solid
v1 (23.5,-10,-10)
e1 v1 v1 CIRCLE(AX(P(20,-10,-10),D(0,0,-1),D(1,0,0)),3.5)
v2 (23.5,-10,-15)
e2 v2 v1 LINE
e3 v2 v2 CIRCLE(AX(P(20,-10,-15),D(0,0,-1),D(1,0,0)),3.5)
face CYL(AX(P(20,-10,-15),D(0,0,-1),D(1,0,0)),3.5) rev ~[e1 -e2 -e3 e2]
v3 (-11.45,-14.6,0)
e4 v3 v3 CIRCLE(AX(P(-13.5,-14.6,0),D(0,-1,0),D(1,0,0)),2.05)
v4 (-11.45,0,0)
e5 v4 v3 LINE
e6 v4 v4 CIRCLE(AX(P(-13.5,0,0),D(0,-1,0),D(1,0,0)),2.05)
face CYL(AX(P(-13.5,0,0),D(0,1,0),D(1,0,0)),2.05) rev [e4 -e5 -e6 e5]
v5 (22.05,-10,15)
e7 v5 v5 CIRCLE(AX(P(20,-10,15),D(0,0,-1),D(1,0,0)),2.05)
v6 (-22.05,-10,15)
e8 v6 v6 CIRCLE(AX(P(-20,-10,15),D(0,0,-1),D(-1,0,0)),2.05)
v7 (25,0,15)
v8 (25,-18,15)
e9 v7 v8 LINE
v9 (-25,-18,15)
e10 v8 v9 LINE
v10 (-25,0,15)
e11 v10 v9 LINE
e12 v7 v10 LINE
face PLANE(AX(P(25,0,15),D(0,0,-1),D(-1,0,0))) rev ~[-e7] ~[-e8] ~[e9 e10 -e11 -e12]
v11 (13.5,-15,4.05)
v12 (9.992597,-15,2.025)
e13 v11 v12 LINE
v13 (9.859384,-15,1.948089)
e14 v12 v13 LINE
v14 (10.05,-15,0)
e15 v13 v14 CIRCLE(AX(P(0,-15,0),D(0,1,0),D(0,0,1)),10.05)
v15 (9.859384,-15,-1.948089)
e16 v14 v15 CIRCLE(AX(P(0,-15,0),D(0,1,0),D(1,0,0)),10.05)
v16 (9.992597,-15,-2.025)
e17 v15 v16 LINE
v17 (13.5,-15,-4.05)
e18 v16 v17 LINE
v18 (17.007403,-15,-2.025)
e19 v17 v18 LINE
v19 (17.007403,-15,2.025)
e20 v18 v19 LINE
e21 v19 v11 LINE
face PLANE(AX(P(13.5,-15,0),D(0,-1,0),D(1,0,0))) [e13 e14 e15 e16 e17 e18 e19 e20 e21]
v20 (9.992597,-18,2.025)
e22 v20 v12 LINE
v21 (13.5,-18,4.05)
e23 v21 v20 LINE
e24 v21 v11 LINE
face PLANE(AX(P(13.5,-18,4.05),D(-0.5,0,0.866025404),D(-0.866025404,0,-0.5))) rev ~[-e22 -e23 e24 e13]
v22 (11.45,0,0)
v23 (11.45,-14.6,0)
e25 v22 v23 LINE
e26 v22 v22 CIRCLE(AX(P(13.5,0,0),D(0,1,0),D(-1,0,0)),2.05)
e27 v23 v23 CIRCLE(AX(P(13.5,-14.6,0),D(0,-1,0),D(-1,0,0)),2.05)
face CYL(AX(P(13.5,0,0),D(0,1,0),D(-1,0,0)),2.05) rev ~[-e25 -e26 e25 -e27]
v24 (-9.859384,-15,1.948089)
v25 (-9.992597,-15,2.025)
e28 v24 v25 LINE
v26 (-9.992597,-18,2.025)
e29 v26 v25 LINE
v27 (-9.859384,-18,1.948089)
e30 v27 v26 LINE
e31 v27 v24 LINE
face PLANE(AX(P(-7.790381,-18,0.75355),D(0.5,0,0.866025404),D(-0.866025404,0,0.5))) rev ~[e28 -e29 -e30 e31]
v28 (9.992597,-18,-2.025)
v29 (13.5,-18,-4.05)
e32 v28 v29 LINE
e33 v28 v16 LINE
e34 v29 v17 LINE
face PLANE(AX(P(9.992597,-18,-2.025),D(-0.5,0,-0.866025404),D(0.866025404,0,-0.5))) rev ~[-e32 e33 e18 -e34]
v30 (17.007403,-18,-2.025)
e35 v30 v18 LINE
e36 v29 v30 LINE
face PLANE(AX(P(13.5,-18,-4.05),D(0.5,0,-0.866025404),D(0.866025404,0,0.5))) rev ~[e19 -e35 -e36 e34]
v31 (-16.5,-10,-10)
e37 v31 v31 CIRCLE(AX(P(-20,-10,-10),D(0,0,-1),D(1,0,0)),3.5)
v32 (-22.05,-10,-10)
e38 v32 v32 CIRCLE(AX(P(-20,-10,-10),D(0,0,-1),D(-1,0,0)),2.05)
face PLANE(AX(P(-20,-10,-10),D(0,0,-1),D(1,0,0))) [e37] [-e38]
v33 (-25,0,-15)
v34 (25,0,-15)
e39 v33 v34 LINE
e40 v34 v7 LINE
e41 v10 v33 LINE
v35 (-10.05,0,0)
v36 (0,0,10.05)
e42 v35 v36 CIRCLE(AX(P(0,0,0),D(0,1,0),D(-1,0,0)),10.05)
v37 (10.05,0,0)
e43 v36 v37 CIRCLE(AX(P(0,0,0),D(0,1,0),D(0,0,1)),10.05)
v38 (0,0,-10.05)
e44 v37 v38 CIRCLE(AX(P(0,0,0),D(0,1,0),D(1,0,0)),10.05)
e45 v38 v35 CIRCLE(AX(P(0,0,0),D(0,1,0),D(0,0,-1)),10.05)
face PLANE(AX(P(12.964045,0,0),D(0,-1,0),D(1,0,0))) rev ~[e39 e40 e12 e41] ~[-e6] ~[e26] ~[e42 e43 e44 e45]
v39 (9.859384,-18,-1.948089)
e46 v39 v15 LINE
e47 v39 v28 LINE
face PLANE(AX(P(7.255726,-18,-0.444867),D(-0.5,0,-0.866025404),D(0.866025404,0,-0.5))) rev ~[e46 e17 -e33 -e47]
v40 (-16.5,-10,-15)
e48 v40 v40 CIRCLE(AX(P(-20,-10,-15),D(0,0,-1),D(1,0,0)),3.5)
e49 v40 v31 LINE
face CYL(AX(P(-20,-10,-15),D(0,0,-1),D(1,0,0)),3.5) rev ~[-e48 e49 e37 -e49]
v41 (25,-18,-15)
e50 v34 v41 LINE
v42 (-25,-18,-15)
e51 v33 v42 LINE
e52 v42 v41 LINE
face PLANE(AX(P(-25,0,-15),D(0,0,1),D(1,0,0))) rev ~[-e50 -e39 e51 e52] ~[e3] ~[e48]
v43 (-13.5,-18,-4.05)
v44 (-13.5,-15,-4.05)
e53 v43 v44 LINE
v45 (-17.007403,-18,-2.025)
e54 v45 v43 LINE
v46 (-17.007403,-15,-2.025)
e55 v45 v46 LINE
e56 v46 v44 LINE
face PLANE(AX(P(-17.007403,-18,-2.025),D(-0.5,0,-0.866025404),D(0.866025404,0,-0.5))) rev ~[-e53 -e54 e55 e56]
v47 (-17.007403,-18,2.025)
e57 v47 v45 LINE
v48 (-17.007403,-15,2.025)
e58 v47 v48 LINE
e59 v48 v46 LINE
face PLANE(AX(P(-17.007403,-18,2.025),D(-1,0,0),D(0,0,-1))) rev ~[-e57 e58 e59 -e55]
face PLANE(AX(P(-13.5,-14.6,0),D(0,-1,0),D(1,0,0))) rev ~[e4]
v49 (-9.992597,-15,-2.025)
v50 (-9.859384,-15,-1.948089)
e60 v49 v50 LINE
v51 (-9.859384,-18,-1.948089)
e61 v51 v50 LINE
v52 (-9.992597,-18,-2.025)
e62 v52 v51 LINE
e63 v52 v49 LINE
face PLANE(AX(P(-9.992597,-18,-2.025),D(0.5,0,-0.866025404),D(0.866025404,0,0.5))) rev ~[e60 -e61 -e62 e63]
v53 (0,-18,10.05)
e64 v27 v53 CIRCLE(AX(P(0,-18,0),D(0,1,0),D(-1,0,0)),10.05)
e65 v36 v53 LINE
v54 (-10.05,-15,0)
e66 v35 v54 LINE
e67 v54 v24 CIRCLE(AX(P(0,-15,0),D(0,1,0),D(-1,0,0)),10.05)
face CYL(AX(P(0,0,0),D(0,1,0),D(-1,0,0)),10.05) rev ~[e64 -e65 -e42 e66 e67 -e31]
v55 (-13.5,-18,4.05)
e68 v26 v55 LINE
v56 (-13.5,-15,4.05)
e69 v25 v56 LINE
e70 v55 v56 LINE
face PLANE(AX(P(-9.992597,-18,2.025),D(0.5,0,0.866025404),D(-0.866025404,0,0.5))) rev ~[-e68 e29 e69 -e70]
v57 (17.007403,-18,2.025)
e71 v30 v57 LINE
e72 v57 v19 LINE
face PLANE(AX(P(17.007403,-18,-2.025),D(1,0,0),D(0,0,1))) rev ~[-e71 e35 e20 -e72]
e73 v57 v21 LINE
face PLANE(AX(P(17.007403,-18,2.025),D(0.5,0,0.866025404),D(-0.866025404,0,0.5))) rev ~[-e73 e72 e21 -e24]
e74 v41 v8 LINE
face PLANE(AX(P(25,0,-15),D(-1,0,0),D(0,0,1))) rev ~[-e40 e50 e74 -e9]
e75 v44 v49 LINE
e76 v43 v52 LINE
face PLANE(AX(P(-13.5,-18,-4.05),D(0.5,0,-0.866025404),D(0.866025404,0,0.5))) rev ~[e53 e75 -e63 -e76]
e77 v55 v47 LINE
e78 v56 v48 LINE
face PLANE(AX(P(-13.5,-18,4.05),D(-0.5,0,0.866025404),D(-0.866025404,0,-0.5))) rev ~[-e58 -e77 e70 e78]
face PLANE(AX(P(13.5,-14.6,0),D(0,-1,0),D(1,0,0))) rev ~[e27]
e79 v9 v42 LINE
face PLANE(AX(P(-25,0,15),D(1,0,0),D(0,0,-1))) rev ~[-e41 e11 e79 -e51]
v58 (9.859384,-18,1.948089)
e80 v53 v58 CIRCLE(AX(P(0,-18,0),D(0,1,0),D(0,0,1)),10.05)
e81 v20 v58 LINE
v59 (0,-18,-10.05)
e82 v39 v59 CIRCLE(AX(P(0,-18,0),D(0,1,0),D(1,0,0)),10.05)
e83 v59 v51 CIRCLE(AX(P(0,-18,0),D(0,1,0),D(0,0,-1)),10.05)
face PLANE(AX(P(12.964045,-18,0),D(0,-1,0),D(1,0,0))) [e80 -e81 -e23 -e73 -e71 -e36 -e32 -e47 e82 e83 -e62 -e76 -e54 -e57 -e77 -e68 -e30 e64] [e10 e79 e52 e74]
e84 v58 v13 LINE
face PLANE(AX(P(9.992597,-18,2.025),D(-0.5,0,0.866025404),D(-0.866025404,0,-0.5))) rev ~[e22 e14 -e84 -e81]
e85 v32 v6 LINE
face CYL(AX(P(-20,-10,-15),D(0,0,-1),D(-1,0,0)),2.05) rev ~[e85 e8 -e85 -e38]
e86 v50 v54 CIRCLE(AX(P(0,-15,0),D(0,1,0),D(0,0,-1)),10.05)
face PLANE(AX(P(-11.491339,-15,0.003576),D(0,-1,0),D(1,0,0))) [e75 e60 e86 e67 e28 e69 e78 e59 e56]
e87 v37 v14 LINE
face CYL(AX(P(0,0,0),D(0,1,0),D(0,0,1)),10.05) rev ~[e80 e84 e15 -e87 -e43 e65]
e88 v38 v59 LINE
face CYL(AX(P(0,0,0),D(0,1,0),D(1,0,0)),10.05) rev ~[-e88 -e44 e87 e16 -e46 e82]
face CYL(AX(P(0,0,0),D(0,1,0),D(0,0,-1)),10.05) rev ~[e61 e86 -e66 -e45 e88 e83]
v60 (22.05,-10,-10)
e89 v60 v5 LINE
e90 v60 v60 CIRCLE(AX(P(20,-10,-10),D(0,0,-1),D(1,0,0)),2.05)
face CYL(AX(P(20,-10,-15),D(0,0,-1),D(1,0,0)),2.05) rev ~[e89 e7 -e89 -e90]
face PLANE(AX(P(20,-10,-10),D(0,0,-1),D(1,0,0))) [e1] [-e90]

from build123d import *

# Parameters (mm, degrees)
F0_R      = 2.05
F1_DEPTH  = 18
F3_DEPTH  = 30
F4_R      = 3.5
F5_DEPTH  = 5
F7_DEPTH  = 3
F8_R      = 2.05
F9_R      = 2.05
F10_DEPTH = 0.4


with BuildPart() as f1:
    # F0 (on Front) → F1 (new body)
    with BuildSketch(Plane.XZ):
        with BuildLine():
            ThreePointArc((0, 10.05), (7.1064231509, 7.1064231509), (10.05, 0))
            ThreePointArc((10.05, 0), (7.1064231509, -7.1064231509), (0, -10.05))
            Line((0, -10.05), (0, -15))
            Line((0, -15), (25, -15))
            Line((25, -15), (25, 0))
            Line((25, 0), (25, 15))
            Line((25, 15), (0, 15))
            Line((0, 15), (0, 10.05))
        make_face()
        with BuildLine():
            ThreePointArc((15.55, 0), (13.5, -2.05), (11.45, 0))
            ThreePointArc((11.45, 0), (13.5, 2.05), (15.55, 0))
        make_face(mode=Mode.SUBTRACT)
        with BuildLine():
            ThreePointArc((-10.05, 0), (-7.1064231509, 7.1064231509), (0, 10.05))
            Line((0, 10.05), (0, 15))
            Line((0, 15), (-25, 15))
            Line((-25, 15), (-25, 0))
            Line((-25, 0), (-25, -15))
            Line((-25, -15), (0, -15))
            Line((0, -15), (0, -10.05))
            ThreePointArc((0, -10.05), (-7.1064231509, -7.1064231509), (-10.05, 0))
        make_face()
        with Locations((-13.5, 0)):
            Circle(F0_R, mode=Mode.SUBTRACT)
    extrude(amount=F1_DEPTH)

    # F2 (on face) → F3 (cut)
    with BuildSketch(Plane(origin=(0, 0, -15), x_dir=(1, 0, 0), z_dir=(0, 0, -1))):
        with BuildLine():
            ThreePointArc((17.95, 10), (20, 7.95), (22.05, 10))
            Line((22.05, 10), (17.95, 10))
        make_face()
        with BuildLine():
            Line((17.95, 10), (22.05, 10))
            ThreePointArc((22.05, 10), (20, 12.05), (17.95, 10))
        make_face()
        with BuildLine():
            ThreePointArc((-17.95, 10), (-20, 12.05), (-22.05, 10))
            Line((-22.05, 10), (-17.95, 10))
        make_face()
        with BuildLine():
            Line((-17.95, 10), (-22.05, 10))
            ThreePointArc((-22.05, 10), (-20, 7.95), (-17.95, 10))
        make_face()
    extrude(amount=-F3_DEPTH, mode=Mode.SUBTRACT)

    # F4 (on face) → F5 (cut)
    with BuildSketch(Plane(origin=(0, 0, -15), x_dir=(1, 0, 0), z_dir=(0, 0, -1))):
        with Locations((20, 10)):
            Circle(F4_R)
        with Locations((-20, 10)):
            Circle(F4_R)
    extrude(amount=-F5_DEPTH, mode=Mode.SUBTRACT)

    # F6 (on face) → F7 (cut)
    with BuildSketch(Plane.XZ.offset(18)):
        Polygon((-13.5, 4.05), (-13.5, 0), (-13.5, -4.05), (-9.9925971147, -2.025), (-7.9662247081, -0.8550733456), (-7.7903810671, 0.7535499721), (-9.9925971147, 2.025), align=None)
        Polygon((-13.5, -4.05), (-13.5, 0), (-13.5, 4.05), (-17.0074028853, 2.025), (-17.0074028853, -2.025), align=None)
        Polygon((13.5, -4.05), (13.5, 0), (13.5, 4.05), (9.9925971147, 2.025), (9.9925971147, -2.025), align=None)
        Polygon((13.5, 4.05), (13.5, 0), (13.5, -4.05), (17.0074028853, -2.025), (17.0074028853, 2.025), align=None)
        Polygon((9.9925971147, -2.025), (9.9925971147, 2.025), (7.4926645733, 0.5816632743), (7.2557264377, -0.4448669779), align=None)
    extrude(amount=-F7_DEPTH, mode=Mode.SUBTRACT)

    # F8 (on face) + F9 (on face) → F10 (join)
    with BuildSketch(Plane.XZ.offset(15)):
        with Locations((13.5, 0)):
            Circle(F8_R)
    with BuildSketch(Plane.XZ.offset(15)):
        with Locations((-13.5, 0)):
            Circle(F9_R)
    extrude(amount=-F10_DEPTH)


solid = f1.part
